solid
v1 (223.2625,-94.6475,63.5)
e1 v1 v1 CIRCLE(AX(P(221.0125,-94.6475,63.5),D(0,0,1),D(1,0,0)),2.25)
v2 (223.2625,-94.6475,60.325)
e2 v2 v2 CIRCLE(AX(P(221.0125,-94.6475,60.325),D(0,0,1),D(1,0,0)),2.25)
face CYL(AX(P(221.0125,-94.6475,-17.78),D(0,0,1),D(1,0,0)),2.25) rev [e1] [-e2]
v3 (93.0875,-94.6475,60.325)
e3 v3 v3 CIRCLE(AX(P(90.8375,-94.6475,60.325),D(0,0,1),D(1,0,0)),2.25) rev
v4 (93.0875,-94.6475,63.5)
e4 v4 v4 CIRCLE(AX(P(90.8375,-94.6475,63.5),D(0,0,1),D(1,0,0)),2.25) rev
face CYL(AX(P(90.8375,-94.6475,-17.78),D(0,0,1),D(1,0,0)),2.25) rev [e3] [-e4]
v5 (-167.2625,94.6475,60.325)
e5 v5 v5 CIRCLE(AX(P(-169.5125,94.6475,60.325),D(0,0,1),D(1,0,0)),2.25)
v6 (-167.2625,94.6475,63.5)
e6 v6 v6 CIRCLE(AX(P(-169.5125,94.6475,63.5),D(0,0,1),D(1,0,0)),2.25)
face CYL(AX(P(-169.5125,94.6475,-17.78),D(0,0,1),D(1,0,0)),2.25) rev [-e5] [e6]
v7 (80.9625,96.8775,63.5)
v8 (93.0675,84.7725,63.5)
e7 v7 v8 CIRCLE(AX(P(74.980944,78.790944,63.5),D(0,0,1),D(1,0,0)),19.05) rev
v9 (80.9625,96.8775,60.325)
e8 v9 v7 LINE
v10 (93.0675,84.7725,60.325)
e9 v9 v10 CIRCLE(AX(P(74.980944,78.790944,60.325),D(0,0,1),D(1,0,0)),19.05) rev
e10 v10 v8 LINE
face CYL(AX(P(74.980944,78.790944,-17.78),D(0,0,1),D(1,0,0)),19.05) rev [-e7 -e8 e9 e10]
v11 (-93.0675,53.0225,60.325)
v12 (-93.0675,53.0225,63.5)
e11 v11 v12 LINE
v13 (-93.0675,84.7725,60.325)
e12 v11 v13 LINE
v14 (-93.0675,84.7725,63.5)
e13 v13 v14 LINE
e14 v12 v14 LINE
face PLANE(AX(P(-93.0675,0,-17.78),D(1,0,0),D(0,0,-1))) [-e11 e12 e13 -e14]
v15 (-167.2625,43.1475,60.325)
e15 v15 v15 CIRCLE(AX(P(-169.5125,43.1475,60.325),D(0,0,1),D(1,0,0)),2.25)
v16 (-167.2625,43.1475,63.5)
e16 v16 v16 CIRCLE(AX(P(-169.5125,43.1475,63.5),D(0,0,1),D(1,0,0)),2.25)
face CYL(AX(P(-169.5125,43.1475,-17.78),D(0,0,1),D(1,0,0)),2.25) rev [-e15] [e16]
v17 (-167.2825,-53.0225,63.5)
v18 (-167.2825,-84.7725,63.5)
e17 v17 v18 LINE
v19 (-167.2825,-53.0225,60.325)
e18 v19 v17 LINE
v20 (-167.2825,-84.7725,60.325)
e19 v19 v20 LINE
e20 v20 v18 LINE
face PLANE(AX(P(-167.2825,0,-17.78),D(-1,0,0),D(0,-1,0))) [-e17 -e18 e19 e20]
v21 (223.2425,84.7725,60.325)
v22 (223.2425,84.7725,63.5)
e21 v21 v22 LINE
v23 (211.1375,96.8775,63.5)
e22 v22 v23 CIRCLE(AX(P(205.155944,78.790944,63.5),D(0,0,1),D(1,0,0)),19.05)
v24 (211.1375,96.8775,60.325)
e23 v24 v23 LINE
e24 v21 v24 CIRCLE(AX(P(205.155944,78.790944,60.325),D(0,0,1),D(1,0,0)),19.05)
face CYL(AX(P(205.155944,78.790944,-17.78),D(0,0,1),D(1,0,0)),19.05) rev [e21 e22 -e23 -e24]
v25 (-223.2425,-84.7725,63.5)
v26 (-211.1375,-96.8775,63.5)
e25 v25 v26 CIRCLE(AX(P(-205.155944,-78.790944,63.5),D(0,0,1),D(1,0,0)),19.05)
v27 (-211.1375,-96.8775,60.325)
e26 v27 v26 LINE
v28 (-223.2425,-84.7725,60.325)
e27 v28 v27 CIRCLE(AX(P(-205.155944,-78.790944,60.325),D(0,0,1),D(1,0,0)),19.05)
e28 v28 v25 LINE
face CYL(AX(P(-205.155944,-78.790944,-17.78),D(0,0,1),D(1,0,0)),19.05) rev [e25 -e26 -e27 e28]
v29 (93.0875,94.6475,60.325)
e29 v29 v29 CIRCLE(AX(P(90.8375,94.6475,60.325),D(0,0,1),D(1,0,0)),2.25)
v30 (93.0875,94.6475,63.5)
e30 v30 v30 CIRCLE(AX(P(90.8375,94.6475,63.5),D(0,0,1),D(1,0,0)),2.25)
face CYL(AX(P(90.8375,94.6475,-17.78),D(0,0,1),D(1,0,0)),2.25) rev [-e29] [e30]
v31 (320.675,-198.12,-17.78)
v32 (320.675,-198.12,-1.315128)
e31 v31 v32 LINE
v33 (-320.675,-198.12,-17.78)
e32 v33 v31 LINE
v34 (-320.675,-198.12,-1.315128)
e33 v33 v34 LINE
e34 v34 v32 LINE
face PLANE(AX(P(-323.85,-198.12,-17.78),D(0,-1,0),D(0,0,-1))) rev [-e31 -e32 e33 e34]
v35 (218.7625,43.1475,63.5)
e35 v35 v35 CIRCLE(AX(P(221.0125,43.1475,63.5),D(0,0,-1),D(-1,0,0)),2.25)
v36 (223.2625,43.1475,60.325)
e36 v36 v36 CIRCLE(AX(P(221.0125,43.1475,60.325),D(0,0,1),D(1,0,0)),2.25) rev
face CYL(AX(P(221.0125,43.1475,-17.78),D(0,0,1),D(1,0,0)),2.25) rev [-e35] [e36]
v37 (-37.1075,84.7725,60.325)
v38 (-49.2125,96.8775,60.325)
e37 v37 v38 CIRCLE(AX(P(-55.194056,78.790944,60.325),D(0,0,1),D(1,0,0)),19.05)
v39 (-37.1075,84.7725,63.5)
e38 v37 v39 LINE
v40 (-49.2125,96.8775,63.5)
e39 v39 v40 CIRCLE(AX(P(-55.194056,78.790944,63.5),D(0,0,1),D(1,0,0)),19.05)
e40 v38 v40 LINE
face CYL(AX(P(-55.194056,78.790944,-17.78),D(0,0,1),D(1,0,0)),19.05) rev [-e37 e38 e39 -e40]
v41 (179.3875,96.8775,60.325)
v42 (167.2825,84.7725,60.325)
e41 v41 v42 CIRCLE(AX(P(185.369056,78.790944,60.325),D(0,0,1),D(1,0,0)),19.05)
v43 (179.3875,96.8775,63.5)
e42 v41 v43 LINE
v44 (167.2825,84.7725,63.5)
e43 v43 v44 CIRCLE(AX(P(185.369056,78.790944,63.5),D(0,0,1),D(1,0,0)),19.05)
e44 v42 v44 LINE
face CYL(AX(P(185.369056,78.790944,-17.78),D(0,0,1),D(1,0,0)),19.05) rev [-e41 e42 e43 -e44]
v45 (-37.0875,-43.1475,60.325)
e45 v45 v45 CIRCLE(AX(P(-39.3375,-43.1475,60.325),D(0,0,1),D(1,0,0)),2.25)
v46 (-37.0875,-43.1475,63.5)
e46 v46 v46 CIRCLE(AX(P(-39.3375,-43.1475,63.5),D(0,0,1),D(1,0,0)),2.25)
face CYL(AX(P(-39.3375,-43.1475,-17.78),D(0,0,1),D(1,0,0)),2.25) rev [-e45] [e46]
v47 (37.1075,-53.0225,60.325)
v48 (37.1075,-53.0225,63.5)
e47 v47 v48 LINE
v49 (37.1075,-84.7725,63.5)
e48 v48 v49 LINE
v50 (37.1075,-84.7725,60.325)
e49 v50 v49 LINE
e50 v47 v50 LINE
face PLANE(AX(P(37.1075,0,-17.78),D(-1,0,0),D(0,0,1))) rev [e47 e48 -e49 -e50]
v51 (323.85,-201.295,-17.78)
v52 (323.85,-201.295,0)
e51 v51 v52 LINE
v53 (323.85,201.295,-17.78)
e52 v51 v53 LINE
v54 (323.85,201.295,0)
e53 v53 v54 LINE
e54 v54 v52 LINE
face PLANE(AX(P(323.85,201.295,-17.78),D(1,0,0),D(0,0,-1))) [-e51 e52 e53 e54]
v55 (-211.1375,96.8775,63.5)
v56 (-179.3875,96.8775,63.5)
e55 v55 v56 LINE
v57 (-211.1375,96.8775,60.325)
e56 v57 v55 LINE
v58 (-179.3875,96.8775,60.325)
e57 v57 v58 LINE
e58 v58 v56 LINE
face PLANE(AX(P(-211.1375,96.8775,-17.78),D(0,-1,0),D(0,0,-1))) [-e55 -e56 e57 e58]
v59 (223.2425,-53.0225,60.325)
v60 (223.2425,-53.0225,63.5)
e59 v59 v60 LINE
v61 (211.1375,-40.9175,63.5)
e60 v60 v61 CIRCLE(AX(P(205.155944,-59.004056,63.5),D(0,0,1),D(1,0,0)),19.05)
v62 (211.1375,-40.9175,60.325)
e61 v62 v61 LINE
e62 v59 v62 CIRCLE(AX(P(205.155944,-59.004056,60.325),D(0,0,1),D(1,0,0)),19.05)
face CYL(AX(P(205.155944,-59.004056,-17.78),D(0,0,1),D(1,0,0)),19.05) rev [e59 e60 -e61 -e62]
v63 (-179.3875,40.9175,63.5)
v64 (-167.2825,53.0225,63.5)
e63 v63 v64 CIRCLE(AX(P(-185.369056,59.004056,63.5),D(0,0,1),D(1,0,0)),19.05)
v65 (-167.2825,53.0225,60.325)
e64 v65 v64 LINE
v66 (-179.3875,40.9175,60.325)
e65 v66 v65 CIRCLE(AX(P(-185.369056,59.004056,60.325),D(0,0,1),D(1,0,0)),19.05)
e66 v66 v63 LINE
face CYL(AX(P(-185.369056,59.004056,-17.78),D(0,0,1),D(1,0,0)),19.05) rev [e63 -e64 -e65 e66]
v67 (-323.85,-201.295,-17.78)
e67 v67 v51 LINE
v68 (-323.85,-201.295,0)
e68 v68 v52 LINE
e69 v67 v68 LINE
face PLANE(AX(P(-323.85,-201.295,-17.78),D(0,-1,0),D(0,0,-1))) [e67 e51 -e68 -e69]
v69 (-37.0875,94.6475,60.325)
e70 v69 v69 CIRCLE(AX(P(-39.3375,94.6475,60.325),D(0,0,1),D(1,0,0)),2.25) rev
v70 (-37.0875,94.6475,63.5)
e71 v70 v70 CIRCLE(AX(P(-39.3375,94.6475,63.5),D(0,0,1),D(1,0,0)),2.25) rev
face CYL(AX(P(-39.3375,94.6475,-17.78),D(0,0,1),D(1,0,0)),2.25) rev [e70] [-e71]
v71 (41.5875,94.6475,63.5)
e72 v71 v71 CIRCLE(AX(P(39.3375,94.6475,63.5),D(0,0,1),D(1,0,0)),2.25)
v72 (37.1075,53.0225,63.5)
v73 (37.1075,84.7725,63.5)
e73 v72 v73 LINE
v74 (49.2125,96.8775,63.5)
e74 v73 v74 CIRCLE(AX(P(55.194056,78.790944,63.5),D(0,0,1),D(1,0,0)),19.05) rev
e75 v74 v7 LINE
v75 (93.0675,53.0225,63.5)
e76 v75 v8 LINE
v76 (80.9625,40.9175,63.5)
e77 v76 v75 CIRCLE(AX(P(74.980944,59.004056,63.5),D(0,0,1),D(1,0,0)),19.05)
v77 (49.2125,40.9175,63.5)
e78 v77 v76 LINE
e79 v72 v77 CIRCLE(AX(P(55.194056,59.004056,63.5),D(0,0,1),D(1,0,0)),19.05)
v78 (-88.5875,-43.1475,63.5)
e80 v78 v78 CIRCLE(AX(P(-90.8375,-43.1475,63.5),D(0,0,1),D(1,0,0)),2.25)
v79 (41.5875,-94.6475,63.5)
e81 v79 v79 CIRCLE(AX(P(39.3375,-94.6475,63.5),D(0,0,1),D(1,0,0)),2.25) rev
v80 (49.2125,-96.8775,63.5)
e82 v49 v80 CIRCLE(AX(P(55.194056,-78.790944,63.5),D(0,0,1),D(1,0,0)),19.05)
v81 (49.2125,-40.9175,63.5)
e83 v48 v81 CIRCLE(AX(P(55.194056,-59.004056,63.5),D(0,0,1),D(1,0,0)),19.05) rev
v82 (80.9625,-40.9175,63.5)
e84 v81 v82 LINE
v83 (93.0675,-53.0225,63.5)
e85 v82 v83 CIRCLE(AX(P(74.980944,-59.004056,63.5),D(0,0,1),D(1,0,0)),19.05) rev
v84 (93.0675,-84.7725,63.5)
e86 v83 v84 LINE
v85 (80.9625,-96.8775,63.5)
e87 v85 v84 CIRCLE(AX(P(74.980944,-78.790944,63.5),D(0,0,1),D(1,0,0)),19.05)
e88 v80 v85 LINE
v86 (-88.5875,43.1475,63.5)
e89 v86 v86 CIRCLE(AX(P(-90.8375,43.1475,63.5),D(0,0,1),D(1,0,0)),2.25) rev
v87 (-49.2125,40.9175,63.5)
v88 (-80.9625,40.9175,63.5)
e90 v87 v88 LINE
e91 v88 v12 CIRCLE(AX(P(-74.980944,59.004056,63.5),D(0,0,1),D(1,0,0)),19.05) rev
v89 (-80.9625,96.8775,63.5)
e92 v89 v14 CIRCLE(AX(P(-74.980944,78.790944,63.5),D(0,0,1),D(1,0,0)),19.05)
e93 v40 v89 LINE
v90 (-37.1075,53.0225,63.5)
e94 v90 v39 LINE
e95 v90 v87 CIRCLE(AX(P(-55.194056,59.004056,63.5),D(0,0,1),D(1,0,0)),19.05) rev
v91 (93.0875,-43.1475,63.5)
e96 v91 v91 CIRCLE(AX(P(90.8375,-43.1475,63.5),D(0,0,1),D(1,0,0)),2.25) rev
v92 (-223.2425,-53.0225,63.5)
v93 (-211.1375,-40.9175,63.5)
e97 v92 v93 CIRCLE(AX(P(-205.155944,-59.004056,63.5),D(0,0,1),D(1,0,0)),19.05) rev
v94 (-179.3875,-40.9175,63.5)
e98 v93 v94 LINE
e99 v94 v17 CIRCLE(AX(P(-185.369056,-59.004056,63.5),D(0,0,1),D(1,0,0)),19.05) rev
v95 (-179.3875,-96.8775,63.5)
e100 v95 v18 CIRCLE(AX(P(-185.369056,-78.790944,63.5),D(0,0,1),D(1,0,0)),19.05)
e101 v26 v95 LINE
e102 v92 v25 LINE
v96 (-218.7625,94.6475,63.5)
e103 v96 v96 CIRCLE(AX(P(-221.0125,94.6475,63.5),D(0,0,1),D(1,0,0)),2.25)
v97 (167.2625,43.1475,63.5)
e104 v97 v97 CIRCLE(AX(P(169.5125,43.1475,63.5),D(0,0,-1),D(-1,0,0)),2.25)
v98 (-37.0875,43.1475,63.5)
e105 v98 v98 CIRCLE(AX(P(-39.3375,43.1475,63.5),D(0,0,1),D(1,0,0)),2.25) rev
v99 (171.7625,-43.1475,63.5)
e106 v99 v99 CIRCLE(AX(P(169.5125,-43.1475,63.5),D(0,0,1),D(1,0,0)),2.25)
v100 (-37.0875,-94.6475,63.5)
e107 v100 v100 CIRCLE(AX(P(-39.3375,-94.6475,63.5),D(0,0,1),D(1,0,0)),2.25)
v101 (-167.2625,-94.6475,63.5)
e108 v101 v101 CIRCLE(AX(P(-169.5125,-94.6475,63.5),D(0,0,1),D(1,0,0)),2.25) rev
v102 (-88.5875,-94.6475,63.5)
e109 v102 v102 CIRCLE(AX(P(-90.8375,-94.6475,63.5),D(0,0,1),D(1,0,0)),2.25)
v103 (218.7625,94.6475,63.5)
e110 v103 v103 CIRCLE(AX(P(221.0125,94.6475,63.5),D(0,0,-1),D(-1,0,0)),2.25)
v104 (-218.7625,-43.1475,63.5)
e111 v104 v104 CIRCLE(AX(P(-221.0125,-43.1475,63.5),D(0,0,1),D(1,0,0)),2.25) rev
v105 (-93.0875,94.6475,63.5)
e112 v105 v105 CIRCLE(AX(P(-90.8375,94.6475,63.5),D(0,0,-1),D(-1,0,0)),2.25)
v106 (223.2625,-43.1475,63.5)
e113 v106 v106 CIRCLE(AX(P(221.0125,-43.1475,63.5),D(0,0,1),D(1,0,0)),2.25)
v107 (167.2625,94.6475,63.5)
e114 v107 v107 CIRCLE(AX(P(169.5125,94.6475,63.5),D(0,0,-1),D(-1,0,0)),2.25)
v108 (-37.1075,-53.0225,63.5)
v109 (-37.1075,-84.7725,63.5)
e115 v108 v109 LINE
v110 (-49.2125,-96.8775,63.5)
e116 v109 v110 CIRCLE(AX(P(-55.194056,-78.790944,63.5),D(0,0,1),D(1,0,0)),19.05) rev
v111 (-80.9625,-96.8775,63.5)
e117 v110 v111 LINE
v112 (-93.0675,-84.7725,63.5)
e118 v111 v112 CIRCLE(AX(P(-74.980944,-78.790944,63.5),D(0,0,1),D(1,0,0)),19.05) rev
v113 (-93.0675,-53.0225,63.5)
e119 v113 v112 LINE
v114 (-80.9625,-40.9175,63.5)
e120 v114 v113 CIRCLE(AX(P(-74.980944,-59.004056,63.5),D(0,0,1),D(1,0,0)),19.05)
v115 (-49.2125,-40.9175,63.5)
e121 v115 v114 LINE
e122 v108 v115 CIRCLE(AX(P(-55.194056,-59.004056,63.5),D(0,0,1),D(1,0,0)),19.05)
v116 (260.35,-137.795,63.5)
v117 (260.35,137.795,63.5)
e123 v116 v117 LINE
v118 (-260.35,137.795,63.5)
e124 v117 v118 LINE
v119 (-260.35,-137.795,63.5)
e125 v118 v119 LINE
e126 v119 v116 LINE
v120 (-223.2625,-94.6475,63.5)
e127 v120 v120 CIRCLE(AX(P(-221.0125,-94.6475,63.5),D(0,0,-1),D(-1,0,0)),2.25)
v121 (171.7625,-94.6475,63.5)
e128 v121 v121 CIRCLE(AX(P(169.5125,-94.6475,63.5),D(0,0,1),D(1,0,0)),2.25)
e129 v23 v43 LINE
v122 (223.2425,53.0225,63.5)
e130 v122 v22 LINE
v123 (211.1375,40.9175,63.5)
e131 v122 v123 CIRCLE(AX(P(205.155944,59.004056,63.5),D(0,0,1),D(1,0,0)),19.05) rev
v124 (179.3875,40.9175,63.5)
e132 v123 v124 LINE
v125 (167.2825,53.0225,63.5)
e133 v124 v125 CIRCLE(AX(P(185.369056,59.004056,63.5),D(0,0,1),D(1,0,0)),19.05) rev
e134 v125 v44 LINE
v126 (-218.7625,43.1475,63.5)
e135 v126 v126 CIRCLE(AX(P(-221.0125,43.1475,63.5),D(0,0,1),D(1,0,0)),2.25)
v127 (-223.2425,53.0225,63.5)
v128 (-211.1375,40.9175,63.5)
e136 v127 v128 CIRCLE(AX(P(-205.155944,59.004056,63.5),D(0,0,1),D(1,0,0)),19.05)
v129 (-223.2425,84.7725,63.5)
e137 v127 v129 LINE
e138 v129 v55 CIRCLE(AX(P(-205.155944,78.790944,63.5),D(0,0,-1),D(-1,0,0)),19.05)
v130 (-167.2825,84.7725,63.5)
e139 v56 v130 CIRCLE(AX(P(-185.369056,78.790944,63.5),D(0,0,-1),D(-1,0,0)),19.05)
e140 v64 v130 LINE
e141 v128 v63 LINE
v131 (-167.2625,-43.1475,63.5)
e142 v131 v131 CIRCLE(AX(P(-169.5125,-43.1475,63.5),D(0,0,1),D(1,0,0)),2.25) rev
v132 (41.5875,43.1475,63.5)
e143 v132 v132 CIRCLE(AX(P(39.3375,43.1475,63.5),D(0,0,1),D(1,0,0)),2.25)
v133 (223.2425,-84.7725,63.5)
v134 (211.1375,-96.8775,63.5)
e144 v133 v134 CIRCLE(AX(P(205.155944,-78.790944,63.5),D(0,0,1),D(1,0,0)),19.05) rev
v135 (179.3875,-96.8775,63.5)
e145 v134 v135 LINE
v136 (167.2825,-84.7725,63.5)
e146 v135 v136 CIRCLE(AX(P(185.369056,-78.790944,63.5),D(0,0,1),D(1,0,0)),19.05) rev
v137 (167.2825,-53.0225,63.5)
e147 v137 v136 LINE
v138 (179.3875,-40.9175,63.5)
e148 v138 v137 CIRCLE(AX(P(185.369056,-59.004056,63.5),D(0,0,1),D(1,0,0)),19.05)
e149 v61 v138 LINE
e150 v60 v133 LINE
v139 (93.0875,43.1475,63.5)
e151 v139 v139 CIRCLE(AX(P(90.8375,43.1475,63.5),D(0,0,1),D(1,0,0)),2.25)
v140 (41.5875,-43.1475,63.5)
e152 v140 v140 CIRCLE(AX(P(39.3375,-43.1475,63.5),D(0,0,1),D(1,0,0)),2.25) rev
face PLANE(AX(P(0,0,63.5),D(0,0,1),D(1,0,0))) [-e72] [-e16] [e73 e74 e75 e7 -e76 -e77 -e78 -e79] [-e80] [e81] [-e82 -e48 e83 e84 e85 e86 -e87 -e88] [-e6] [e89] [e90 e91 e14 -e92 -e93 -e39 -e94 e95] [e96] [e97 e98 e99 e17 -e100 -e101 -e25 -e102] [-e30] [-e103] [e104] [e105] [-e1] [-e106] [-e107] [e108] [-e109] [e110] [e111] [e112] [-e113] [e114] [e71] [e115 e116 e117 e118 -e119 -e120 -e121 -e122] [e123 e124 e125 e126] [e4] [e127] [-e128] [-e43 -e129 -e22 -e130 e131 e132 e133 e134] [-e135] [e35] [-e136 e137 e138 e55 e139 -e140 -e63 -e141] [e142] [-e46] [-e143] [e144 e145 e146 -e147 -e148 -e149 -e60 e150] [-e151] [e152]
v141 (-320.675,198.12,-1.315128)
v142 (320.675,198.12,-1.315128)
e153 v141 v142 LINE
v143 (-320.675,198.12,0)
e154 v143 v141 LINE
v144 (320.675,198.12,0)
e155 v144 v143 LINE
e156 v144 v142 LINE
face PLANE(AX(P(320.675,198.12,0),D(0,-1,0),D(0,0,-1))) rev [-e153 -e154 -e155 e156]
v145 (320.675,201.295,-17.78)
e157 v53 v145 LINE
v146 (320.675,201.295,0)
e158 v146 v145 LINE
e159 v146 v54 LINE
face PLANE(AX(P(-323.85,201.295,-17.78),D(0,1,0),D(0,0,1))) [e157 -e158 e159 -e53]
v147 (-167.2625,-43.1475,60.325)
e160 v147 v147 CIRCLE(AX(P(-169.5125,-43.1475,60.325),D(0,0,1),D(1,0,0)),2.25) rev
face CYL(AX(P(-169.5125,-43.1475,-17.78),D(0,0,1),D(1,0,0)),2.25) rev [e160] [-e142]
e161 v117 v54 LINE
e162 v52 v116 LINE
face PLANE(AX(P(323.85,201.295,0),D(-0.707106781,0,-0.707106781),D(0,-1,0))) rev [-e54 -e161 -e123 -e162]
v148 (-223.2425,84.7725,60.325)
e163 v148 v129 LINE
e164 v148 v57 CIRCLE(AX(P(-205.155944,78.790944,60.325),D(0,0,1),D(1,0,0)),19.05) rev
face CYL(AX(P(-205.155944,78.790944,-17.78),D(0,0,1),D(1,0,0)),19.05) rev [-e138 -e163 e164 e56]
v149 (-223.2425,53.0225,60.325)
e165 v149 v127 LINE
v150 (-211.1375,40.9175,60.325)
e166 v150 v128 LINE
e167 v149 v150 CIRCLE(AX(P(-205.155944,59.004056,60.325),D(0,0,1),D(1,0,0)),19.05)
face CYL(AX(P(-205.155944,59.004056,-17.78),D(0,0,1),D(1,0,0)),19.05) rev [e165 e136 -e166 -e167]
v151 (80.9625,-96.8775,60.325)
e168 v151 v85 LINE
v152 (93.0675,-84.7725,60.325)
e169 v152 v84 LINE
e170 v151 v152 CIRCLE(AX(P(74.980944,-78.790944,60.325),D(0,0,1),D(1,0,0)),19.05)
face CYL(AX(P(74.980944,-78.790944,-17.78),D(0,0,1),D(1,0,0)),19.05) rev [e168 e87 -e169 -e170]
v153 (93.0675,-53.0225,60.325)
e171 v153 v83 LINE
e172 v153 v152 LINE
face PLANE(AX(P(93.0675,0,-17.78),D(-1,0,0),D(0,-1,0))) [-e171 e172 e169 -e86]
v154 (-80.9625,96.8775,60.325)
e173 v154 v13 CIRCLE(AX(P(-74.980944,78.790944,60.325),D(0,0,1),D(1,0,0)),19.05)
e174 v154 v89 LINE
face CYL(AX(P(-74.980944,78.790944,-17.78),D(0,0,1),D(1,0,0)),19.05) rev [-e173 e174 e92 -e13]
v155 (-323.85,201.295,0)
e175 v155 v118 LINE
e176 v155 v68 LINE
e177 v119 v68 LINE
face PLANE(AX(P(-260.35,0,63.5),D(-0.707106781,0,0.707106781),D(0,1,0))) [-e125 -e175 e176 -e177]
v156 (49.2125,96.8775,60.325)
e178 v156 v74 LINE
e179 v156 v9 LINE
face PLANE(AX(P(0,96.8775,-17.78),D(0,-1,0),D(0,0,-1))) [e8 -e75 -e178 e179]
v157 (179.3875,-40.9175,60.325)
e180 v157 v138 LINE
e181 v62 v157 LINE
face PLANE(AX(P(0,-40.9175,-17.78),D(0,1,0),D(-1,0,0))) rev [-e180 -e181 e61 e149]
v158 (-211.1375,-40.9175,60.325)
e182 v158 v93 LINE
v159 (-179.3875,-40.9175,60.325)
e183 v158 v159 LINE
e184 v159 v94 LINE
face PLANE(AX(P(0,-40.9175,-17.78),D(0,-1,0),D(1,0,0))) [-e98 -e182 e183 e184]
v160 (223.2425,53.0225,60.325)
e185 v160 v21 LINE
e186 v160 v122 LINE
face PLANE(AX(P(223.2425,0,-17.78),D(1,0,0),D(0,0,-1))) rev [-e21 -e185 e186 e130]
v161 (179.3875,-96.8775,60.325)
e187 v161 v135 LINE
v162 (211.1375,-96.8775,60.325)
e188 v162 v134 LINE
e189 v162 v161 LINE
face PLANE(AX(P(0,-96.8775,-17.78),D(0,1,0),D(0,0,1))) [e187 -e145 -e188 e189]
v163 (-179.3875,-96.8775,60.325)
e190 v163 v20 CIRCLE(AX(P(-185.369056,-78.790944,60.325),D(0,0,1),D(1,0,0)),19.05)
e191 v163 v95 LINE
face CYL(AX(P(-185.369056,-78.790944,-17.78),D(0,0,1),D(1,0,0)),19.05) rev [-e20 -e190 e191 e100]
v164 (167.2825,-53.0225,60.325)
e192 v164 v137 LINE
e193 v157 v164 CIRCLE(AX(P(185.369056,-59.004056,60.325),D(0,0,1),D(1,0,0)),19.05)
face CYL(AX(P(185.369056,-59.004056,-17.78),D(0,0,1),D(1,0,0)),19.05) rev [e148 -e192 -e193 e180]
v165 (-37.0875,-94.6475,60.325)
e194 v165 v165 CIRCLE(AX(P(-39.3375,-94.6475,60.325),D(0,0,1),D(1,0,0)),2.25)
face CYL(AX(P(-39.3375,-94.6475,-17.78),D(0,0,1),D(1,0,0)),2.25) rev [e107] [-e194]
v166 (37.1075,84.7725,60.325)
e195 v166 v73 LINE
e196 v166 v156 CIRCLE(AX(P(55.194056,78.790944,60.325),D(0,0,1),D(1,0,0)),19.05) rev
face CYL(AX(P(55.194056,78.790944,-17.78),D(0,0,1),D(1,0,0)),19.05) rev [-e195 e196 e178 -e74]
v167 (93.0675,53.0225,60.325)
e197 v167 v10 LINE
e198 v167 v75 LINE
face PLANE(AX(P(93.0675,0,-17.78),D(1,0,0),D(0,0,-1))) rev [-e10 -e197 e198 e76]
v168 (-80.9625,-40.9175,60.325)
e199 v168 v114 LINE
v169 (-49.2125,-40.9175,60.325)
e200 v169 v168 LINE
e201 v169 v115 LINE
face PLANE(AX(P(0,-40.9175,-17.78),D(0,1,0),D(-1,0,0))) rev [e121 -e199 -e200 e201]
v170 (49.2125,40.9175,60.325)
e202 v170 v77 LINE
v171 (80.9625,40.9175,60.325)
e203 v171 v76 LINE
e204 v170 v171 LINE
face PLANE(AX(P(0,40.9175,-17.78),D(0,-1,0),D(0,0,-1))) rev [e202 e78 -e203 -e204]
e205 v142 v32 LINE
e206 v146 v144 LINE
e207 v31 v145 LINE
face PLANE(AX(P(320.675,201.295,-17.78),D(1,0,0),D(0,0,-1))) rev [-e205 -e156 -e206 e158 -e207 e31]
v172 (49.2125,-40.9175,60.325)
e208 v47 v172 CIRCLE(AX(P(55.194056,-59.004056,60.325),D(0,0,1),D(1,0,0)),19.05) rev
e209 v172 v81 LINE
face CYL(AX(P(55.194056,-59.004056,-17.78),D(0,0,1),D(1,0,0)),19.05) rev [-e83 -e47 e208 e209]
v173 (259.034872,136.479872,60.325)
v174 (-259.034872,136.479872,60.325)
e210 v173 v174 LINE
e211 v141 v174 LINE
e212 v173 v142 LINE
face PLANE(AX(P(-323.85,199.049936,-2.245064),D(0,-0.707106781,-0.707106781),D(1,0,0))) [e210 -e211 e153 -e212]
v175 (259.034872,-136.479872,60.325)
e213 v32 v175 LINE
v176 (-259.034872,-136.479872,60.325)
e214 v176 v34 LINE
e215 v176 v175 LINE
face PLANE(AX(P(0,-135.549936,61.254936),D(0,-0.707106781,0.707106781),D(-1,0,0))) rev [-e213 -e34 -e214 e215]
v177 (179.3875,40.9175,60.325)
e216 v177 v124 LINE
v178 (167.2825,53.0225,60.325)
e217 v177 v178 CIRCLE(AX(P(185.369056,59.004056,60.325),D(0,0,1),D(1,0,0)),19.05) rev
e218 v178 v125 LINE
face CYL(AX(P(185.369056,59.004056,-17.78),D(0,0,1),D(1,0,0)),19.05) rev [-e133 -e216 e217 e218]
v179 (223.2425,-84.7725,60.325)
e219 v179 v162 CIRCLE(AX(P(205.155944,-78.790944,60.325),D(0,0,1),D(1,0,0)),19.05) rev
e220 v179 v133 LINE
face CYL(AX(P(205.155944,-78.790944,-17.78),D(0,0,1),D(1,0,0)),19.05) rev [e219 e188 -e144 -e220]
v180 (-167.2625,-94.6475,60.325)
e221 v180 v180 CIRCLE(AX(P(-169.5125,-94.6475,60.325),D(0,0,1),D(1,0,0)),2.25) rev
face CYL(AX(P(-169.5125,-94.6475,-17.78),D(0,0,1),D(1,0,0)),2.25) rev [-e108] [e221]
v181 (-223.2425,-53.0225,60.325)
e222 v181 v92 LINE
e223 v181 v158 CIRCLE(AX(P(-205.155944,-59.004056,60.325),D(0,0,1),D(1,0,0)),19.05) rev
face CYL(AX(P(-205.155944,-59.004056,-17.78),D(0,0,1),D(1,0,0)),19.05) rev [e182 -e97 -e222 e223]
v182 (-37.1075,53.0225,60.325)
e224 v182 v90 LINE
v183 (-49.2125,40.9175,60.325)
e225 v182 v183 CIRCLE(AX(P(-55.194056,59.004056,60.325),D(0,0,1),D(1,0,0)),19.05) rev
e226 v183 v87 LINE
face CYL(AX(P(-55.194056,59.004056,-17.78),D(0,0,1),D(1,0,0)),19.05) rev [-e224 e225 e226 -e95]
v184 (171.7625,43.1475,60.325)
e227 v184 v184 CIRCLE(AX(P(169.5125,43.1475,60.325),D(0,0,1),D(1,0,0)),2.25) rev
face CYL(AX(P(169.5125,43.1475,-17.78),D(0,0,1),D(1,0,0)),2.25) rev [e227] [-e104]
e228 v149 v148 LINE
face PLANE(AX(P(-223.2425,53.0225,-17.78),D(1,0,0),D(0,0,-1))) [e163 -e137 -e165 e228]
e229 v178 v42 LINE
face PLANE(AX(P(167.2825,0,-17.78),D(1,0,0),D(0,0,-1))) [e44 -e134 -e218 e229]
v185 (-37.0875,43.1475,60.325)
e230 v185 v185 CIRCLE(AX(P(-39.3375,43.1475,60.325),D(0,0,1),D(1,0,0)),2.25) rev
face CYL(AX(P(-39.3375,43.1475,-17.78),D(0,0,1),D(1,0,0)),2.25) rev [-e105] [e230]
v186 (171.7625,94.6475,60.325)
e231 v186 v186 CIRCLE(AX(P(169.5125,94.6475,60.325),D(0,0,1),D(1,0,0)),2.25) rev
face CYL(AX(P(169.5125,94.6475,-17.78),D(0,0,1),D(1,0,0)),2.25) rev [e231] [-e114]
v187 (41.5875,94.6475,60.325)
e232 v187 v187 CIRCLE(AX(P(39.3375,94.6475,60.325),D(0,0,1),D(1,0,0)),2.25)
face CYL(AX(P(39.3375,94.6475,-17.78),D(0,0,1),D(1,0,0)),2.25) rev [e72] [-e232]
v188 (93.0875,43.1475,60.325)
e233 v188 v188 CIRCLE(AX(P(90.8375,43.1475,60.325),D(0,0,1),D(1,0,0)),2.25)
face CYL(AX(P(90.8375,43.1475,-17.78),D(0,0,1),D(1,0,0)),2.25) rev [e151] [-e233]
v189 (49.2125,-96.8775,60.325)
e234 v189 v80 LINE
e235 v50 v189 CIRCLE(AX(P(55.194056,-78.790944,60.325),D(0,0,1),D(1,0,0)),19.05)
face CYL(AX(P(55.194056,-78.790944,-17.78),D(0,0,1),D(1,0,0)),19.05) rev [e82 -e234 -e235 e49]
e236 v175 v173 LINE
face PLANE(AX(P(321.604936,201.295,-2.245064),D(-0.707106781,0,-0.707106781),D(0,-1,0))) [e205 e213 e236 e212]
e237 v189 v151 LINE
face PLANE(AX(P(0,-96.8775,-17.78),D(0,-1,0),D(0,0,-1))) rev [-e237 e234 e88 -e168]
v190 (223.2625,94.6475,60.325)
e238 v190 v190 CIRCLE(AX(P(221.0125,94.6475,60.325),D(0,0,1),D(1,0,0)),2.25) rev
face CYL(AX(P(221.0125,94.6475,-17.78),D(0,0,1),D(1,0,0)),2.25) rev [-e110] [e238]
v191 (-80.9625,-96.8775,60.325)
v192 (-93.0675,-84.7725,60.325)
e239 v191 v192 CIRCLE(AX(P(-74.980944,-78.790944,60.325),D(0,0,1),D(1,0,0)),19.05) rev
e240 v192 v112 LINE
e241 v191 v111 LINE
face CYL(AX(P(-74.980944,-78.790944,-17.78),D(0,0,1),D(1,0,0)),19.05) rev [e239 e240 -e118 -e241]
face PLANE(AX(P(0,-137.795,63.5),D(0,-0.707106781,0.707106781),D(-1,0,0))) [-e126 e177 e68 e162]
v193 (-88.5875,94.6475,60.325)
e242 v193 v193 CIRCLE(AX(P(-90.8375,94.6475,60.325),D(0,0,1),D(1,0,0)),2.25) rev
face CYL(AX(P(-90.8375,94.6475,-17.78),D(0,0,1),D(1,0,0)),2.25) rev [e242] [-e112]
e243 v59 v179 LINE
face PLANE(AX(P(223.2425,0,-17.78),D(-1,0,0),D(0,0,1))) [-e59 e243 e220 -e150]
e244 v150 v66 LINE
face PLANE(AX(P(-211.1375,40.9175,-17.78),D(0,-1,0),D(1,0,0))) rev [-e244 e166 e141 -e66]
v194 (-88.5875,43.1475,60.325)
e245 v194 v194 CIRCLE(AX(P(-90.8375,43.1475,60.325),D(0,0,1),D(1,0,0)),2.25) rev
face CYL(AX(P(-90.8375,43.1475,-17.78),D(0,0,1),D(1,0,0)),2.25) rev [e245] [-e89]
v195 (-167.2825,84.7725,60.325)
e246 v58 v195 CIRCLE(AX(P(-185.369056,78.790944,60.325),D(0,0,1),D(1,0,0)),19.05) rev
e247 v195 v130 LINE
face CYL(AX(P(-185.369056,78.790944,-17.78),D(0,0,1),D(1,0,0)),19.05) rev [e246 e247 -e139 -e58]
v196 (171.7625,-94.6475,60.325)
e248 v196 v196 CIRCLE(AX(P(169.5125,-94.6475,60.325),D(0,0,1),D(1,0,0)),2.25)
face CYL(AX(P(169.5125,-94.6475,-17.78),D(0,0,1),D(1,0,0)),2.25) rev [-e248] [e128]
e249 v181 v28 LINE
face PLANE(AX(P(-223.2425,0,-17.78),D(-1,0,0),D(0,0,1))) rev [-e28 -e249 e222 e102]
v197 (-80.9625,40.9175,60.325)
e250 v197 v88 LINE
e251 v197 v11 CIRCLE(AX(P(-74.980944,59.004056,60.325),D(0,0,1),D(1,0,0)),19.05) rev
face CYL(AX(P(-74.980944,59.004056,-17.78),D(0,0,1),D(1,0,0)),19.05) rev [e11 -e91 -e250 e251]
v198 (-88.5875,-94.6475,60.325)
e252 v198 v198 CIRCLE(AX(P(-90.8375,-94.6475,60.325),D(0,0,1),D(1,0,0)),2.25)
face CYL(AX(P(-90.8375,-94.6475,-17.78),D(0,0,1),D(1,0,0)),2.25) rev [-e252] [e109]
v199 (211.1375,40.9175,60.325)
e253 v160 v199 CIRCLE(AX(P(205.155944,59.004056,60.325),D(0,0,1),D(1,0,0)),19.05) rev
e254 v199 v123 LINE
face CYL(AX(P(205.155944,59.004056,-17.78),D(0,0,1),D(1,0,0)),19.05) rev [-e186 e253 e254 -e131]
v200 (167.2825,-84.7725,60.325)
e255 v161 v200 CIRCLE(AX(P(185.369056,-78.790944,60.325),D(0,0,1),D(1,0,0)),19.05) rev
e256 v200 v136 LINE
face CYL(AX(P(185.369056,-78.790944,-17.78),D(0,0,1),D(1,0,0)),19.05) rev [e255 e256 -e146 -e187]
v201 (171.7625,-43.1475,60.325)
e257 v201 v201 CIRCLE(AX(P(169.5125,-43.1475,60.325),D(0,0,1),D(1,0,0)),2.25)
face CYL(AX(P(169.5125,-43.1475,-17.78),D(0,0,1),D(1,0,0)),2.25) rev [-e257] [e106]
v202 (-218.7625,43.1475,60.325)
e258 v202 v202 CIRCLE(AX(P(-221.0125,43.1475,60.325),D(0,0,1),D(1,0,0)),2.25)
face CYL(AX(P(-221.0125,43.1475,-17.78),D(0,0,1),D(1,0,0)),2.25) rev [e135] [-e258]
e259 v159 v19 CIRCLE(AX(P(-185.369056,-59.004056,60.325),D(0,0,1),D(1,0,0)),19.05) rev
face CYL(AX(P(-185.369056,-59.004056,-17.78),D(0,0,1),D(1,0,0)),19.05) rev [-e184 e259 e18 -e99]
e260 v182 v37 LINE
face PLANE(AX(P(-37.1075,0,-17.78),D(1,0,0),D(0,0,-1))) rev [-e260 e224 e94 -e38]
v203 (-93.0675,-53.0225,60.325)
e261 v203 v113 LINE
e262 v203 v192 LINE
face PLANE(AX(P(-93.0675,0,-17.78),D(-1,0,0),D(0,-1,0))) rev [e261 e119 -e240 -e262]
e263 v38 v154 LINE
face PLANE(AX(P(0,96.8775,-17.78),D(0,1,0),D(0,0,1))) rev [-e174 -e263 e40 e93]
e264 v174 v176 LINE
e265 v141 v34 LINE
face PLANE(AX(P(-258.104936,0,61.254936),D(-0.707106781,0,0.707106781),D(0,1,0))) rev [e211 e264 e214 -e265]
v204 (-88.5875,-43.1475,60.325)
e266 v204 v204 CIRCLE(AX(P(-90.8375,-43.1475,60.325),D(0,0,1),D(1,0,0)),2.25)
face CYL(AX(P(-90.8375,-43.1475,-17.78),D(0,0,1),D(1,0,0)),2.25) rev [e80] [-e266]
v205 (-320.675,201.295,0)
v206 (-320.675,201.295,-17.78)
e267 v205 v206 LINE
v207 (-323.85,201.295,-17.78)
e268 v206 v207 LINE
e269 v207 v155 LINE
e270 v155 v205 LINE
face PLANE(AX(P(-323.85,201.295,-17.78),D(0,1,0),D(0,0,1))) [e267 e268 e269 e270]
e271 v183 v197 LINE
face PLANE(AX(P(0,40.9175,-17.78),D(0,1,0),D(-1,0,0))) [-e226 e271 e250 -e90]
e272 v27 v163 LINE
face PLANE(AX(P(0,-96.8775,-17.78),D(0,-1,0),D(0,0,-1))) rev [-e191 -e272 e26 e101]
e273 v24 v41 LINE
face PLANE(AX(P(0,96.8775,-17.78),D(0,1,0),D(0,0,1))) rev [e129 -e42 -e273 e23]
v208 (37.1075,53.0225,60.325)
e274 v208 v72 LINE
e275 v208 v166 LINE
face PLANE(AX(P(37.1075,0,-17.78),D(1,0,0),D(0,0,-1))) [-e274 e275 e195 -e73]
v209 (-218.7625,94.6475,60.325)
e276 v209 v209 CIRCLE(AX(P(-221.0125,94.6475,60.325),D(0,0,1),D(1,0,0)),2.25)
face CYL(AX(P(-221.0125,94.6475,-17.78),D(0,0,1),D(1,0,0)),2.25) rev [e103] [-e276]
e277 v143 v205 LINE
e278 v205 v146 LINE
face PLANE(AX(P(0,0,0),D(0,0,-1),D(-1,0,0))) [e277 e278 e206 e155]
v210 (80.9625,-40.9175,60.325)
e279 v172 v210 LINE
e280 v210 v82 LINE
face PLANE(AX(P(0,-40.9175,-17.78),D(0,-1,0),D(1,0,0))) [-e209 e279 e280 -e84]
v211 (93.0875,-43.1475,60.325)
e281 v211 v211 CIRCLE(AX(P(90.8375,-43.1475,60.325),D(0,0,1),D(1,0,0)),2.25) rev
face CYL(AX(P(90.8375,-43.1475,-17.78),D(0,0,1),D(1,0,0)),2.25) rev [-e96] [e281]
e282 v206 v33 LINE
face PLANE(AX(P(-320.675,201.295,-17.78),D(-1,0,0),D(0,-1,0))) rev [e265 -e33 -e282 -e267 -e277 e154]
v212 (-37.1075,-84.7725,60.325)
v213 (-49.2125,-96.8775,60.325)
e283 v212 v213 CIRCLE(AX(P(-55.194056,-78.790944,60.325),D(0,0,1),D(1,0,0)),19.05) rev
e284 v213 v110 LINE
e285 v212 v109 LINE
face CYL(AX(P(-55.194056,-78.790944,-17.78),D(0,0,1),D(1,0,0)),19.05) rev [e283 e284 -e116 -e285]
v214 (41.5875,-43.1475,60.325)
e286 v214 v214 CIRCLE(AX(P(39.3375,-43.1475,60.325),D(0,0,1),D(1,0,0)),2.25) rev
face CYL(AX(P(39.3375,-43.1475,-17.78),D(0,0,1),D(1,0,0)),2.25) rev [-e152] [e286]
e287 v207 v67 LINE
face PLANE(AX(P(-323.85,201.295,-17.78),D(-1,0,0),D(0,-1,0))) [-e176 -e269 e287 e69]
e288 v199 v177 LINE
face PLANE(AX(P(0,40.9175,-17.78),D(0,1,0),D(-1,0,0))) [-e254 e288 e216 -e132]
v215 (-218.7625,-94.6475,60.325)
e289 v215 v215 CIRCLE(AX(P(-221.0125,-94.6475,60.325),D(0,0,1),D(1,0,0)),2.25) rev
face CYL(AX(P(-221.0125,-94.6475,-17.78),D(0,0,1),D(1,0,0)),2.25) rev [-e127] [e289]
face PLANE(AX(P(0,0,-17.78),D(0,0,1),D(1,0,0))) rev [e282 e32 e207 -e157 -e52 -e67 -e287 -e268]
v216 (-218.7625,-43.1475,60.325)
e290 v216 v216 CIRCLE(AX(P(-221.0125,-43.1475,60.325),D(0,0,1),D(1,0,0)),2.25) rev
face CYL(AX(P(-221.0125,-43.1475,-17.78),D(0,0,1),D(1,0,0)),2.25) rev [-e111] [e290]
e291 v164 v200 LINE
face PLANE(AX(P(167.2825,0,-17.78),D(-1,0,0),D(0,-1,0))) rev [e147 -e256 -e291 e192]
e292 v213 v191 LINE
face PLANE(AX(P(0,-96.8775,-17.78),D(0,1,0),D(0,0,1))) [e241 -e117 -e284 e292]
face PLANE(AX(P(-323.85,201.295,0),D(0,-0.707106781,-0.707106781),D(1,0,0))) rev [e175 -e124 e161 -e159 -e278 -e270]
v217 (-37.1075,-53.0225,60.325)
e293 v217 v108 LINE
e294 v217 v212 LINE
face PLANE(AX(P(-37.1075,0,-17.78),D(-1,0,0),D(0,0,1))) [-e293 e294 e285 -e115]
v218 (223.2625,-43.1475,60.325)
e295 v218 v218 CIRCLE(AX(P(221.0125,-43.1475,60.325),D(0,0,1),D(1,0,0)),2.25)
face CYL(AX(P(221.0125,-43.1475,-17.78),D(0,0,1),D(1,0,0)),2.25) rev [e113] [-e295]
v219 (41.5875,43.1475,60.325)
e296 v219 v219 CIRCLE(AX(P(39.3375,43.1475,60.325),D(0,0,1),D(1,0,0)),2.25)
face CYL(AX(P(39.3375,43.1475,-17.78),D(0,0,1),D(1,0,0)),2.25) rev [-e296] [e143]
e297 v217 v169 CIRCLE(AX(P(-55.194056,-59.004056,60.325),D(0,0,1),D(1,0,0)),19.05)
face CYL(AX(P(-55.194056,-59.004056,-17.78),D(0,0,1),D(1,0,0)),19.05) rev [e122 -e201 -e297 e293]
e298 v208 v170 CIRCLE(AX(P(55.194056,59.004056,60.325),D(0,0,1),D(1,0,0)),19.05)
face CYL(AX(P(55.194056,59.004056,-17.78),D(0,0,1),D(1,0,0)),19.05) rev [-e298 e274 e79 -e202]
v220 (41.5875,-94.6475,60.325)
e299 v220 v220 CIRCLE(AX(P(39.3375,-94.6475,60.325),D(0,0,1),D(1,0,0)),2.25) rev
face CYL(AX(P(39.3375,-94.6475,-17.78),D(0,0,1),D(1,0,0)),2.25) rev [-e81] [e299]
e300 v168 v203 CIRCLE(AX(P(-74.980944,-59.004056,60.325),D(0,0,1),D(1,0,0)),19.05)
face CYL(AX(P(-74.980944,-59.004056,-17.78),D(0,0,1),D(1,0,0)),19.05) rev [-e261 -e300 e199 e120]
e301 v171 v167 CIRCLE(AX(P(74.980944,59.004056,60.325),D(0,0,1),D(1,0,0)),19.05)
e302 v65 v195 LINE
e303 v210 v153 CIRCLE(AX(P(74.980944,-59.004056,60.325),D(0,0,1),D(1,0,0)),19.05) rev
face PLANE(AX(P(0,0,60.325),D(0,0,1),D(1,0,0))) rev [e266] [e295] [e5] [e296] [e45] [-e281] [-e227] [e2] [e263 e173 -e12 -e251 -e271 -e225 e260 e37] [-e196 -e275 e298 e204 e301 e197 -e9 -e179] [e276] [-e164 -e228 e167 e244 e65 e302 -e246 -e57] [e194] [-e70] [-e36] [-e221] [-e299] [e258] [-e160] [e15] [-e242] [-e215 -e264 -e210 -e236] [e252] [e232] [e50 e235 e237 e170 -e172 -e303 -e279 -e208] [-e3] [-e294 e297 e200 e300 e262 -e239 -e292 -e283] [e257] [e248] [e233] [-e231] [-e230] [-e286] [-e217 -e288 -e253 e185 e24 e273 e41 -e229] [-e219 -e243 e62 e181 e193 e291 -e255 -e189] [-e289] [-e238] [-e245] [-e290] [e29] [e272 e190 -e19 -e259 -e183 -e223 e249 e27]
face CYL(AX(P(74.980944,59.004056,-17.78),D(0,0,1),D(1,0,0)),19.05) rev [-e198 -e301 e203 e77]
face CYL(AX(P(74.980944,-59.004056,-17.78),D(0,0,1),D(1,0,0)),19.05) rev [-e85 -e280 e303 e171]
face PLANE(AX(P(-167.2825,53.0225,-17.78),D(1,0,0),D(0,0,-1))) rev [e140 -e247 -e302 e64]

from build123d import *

# Parameters (mm, degrees)
SKETCH1_W               = 647.7
SKETCH1_H               = 402.59
BOSS_EXTRUDE1_DEPTH     = 63.5
CHAMFER1_SIZE           = 63.5
CHAMFER2_SIZE           = 63.5
SKETCH3_W               = 647.7
SKETCH3_H               = 402.59
BOSS_EXTRUDE2_DEPTH     = 17.78
SHELL1_T                = -3.175
SKETCH4_W               = 641.35
SKETCH4_H               = 3.175
CUT_EXTRUDE1_DEPTH      = 17.78
CUT_EXTRUDE3_DEPTH      = 390.878106496
CUT_EXTRUDE3_DEPTH_BACK = 390.878106496
SKETCH2_R               = 2.25


with BuildPart() as part:
    # Sketch1 → Boss-Extrude1 (new body)
    with BuildSketch(Plane.XY):
        Rectangle(SKETCH1_W, SKETCH1_H)
    extrude(amount=BOSS_EXTRUDE1_DEPTH)

    # Chamfer1
    chamfer1_edges = [part.edges().sort_by_distance(p)[0] for p in [
        (0, 201.295, 63.5),
        (0, -201.295, 63.5),
    ]]
    chamfer(chamfer1_edges, length=CHAMFER1_SIZE - 0.0001)  # a hair under: the kernel refuses the full size

    # Chamfer2
    chamfer2_edges = [part.edges().sort_by_distance(p)[0] for p in [
        (-323.85, 0, 63.5),
        (323.85, 0, 63.5),
    ]]
    chamfer(chamfer2_edges, length=CHAMFER2_SIZE - 0.0001)  # a hair under: the kernel refuses the full size

    # Sketch3 → Boss-Extrude2 (add)
    with BuildSketch(Plane.XY):
        Rectangle(SKETCH3_W, SKETCH3_H)
    extrude(amount=-BOSS_EXTRUDE2_DEPTH)

    # Shell1
    shell1_openings = [part.faces().sort_by_distance(p)[0] for p in [
        (0, 0, -17.78),
    ]]
    offset(amount=SHELL1_T, openings=shell1_openings, kind=Kind.INTERSECTION)

    # Sketch4 → Cut-Extrude1 (cut)
    with BuildSketch(Plane(origin=(0, 0, -17.78), x_dir=(-1, 0, 0), z_dir=(0, 0, -1))):
        with Locations((0, 199.7075)):
            Rectangle(SKETCH4_W, SKETCH4_H)
    extrude(amount=-CUT_EXTRUDE1_DEPTH, mode=Mode.SUBTRACT)

    # Sketch2 → Cut-Extrude3 (cut, two sides: drawn at the far end of the back side and taken through both)
    with BuildSketch(Plane.XY.offset(63.5).offset(-CUT_EXTRUDE3_DEPTH_BACK)):
        with BuildLine():
            Line((-37.107499953, 53.0225), (-37.107499953, 84.7725))
            ThreePointArc((-37.107499953, 84.7725), (-41.723671365, 92.261328635), (-49.2125, 96.877500047))
            Line((-49.2125, 96.877500047), (-80.9625, 96.877500047))
            ThreePointArc((-80.9625, 96.877500047), (-88.451328635, 92.261328635), (-93.067500047, 84.7725))
            Line((-93.067500047, 84.7725), (-93.067500047, 53.0225))
            ThreePointArc((-93.067500047, 53.0225), (-88.451328635, 45.533671365), (-80.9625, 40.917499953))
            Line((-80.9625, 40.917499953), (-49.2125, 40.917499953))
            ThreePointArc((-49.2125, 40.917499953), (-41.723671365, 45.533671365), (-37.107499953, 53.0225))
        make_face()
        with Locations((-221.012500062, 43.147499938)):
            Circle(SKETCH2_R)
        with Locations((-169.512499938, 43.147499938)):
            Circle(SKETCH2_R)
        with Locations((-39.337499938, 94.647500062)):
            Circle(SKETCH2_R)
        with Locations((-90.837500062, 43.147499938)):
            Circle(SKETCH2_R)
        with Locations((-39.337499938, 43.147499938)):
            Circle(SKETCH2_R)
        with BuildLine():
            ThreePointArc((80.9625, 96.877500047), (88.451328635, 92.261328635), (93.067500047, 84.7725))
            Line((93.067500047, 84.7725), (93.067500047, 53.0225))
            ThreePointArc((93.067500047, 53.0225), (88.451328635, 45.533671365), (80.9625, 40.917499953))
            Line((80.9625, 40.917499953), (49.2125, 40.917499953))
            ThreePointArc((49.2125, 40.917499953), (41.723671365, 45.533671365), (37.107499953, 53.0225))
            Line((37.107499953, 53.0225), (37.107499953, 84.7725))
            ThreePointArc((37.107499953, 84.7725), (41.723671365, 92.261328635), (49.2125, 96.877500047))
            Line((49.2125, 96.877500047), (80.9625, 96.877500047))
        make_face()
        with BuildLine():
            Line((223.242500047, 53.0225), (223.242500047, 84.7725))
            ThreePointArc((223.242500047, 84.7725), (218.626328635, 92.261328635), (211.1375, 96.877500047))
            Line((211.1375, 96.877500047), (179.3875, 96.877500047))
            ThreePointArc((179.3875, 96.877500047), (171.898671365, 92.261328635), (167.282499953, 84.7725))
            Line((167.282499953, 84.7725), (167.282499953, 53.0225))
            ThreePointArc((167.282499953, 53.0225), (171.898671365, 45.533671365), (179.3875, 40.917499953))
            Line((179.3875, 40.917499953), (211.1375, 40.917499953))
            ThreePointArc((211.1375, 40.917499953), (218.626328635, 45.533671365), (223.242500047, 53.0225))
        make_face()
        with BuildLine():
            Line((-223.242500047, -53.0225), (-223.242500047, -84.7725))
            ThreePointArc((-223.242500047, -84.7725), (-218.626328635, -92.261328635), (-211.1375, -96.877500047))
            Line((-211.1375, -96.877500047), (-179.3875, -96.877500047))
            ThreePointArc((-179.3875, -96.877500047), (-171.898671365, -92.261328635), (-167.282499953, -84.7725))
            Line((-167.282499953, -84.7725), (-167.282499953, -53.0225))
            ThreePointArc((-167.282499953, -53.0225), (-171.898671365, -45.533671365), (-179.3875, -40.917499953))
            Line((-179.3875, -40.917499953), (-211.1375, -40.917499953))
            ThreePointArc((-211.1375, -40.917499953), (-218.626328635, -45.533671365), (-223.242500047, -53.0225))
        make_face()
        with BuildLine():
            ThreePointArc((-80.9625, -96.877500047), (-88.451328635, -92.261328635), (-93.067500047, -84.7725))
            Line((-93.067500047, -84.7725), (-93.067500047, -53.0225))
            ThreePointArc((-93.067500047, -53.0225), (-88.451328635, -45.533671365), (-80.9625, -40.917499953))
            Line((-80.9625, -40.917499953), (-49.2125, -40.917499953))
            ThreePointArc((-49.2125, -40.917499953), (-41.723671365, -45.533671365), (-37.107499953, -53.0225))
            Line((-37.107499953, -53.0225), (-37.107499953, -84.7725))
            ThreePointArc((-37.107499953, -84.7725), (-41.723671365, -92.261328635), (-49.2125, -96.877500047))
            Line((-49.2125, -96.877500047), (-80.9625, -96.877500047))
        make_face()
        with BuildLine():
            Line((37.107499953, -53.0225), (37.107499953, -84.7725))
            ThreePointArc((37.107499953, -84.7725), (41.723671365, -92.261328635), (49.2125, -96.877500047))
            Line((49.2125, -96.877500047), (80.9625, -96.877500047))
            ThreePointArc((80.9625, -96.877500047), (88.451328635, -92.261328635), (93.067500047, -84.7725))
            Line((93.067500047, -84.7725), (93.067500047, -53.0225))
            ThreePointArc((93.067500047, -53.0225), (88.451328635, -45.533671365), (80.9625, -40.917499953))
            Line((80.9625, -40.917499953), (49.2125, -40.917499953))
            ThreePointArc((49.2125, -40.917499953), (41.723671365, -45.533671365), (37.107499953, -53.0225))
        make_face()
        with BuildLine():
            ThreePointArc((179.3875, -96.877500047), (171.898671365, -92.261328635), (167.282499953, -84.7725))
            Line((167.282499953, -84.7725), (167.282499953, -53.0225))
            ThreePointArc((167.282499953, -53.0225), (171.898671365, -45.533671365), (179.3875, -40.917499953))
            Line((179.3875, -40.917499953), (211.1375, -40.917499953))
            ThreePointArc((211.1375, -40.917499953), (218.626328635, -45.533671365), (223.242500047, -53.0225))
            Line((223.242500047, -53.0225), (223.242500047, -84.7725))
            ThreePointArc((223.242500047, -84.7725), (218.626328635, -92.261328635), (211.1375, -96.877500047))
            Line((211.1375, -96.877500047), (179.3875, -96.877500047))
        make_face()
        with Locations((39.337499938, 94.647500062)):
            Circle(SKETCH2_R)
        with Locations((90.837500062, 94.647500062)):
            Circle(SKETCH2_R)
        with Locations((90.837500062, 43.147499938)):
            Circle(SKETCH2_R)
        with Locations((-221.012500062, -43.147499938)):
            Circle(SKETCH2_R)
        with Locations((-169.512499938, -43.147499938)):
            Circle(SKETCH2_R)
        with Locations((-169.512499938, -94.647500062)):
            Circle(SKETCH2_R)
        with Locations((-90.837500062, -43.147499938)):
            Circle(SKETCH2_R)
        with Locations((-39.337499938, -43.147499938)):
            Circle(SKETCH2_R)
        with Locations((-90.837500062, -94.647500062)):
            Circle(SKETCH2_R)
        with Locations((39.337499938, -43.147499938)):
            Circle(SKETCH2_R)
        with Locations((39.337499938, -94.647500062)):
            Circle(SKETCH2_R)
        with Locations((90.837500062, -43.147499938)):
            Circle(SKETCH2_R)
        with Locations((90.837500062, -94.647500062)):
            Circle(SKETCH2_R)
        with Locations((169.512499938, -43.147499938)):
            Circle(SKETCH2_R)
        with Locations((221.012500062, -43.147499938)):
            Circle(SKETCH2_R)
        with Locations((169.512499938, -94.647500062)):
            Circle(SKETCH2_R)
        with Locations((221.012500062, -94.647500062)):
            Circle(SKETCH2_R)
        with BuildLine():
            ThreePointArc((-223.242500047, 84.7725), (-218.626328635, 92.261328635), (-211.1375, 96.877500047))
            Line((-211.1375, 96.877500047), (-179.3875, 96.877500047))
            ThreePointArc((-179.3875, 96.877500047), (-171.898671365, 92.261328635), (-167.282499953, 84.7725))
            Line((-167.282499953, 84.7725), (-167.282499953, 53.0225))
            ThreePointArc((-167.282499953, 53.0225), (-171.898671365, 45.533671365), (-179.3875, 40.917499953))
            Line((-179.3875, 40.917499953), (-211.1375, 40.917499953))
            ThreePointArc((-211.1375, 40.917499953), (-218.626328635, 45.533671365), (-223.242500047, 53.0225))
            Line((-223.242500047, 53.0225), (-223.242500047, 84.7725))
        make_face()
        with Locations((-221.012500062, 94.647500062)):
            Circle(SKETCH2_R)
        with Locations((-169.512499938, 94.647500062)):
            Circle(SKETCH2_R)
        with Locations((-90.837500062, 94.647500062)):
            Circle(SKETCH2_R)
        with Locations((39.337499938, 43.147499938)):
            Circle(SKETCH2_R)
        with Locations((169.512499938, 94.647500062)):
            Circle(SKETCH2_R)
        with Locations((169.512499938, 43.147499938)):
            Circle(SKETCH2_R)
        with Locations((221.012500062, 94.647500062)):
            Circle(SKETCH2_R)
        with Locations((221.012500062, 43.147499938)):
            Circle(SKETCH2_R)
        with Locations((-221.012500062, -94.647500062)):
            Circle(SKETCH2_R)
        with Locations((-39.337499938, -94.647500062)):
            Circle(SKETCH2_R)
    extrude(amount=CUT_EXTRUDE3_DEPTH + CUT_EXTRUDE3_DEPTH_BACK, mode=Mode.SUBTRACT)


solid = part.part
